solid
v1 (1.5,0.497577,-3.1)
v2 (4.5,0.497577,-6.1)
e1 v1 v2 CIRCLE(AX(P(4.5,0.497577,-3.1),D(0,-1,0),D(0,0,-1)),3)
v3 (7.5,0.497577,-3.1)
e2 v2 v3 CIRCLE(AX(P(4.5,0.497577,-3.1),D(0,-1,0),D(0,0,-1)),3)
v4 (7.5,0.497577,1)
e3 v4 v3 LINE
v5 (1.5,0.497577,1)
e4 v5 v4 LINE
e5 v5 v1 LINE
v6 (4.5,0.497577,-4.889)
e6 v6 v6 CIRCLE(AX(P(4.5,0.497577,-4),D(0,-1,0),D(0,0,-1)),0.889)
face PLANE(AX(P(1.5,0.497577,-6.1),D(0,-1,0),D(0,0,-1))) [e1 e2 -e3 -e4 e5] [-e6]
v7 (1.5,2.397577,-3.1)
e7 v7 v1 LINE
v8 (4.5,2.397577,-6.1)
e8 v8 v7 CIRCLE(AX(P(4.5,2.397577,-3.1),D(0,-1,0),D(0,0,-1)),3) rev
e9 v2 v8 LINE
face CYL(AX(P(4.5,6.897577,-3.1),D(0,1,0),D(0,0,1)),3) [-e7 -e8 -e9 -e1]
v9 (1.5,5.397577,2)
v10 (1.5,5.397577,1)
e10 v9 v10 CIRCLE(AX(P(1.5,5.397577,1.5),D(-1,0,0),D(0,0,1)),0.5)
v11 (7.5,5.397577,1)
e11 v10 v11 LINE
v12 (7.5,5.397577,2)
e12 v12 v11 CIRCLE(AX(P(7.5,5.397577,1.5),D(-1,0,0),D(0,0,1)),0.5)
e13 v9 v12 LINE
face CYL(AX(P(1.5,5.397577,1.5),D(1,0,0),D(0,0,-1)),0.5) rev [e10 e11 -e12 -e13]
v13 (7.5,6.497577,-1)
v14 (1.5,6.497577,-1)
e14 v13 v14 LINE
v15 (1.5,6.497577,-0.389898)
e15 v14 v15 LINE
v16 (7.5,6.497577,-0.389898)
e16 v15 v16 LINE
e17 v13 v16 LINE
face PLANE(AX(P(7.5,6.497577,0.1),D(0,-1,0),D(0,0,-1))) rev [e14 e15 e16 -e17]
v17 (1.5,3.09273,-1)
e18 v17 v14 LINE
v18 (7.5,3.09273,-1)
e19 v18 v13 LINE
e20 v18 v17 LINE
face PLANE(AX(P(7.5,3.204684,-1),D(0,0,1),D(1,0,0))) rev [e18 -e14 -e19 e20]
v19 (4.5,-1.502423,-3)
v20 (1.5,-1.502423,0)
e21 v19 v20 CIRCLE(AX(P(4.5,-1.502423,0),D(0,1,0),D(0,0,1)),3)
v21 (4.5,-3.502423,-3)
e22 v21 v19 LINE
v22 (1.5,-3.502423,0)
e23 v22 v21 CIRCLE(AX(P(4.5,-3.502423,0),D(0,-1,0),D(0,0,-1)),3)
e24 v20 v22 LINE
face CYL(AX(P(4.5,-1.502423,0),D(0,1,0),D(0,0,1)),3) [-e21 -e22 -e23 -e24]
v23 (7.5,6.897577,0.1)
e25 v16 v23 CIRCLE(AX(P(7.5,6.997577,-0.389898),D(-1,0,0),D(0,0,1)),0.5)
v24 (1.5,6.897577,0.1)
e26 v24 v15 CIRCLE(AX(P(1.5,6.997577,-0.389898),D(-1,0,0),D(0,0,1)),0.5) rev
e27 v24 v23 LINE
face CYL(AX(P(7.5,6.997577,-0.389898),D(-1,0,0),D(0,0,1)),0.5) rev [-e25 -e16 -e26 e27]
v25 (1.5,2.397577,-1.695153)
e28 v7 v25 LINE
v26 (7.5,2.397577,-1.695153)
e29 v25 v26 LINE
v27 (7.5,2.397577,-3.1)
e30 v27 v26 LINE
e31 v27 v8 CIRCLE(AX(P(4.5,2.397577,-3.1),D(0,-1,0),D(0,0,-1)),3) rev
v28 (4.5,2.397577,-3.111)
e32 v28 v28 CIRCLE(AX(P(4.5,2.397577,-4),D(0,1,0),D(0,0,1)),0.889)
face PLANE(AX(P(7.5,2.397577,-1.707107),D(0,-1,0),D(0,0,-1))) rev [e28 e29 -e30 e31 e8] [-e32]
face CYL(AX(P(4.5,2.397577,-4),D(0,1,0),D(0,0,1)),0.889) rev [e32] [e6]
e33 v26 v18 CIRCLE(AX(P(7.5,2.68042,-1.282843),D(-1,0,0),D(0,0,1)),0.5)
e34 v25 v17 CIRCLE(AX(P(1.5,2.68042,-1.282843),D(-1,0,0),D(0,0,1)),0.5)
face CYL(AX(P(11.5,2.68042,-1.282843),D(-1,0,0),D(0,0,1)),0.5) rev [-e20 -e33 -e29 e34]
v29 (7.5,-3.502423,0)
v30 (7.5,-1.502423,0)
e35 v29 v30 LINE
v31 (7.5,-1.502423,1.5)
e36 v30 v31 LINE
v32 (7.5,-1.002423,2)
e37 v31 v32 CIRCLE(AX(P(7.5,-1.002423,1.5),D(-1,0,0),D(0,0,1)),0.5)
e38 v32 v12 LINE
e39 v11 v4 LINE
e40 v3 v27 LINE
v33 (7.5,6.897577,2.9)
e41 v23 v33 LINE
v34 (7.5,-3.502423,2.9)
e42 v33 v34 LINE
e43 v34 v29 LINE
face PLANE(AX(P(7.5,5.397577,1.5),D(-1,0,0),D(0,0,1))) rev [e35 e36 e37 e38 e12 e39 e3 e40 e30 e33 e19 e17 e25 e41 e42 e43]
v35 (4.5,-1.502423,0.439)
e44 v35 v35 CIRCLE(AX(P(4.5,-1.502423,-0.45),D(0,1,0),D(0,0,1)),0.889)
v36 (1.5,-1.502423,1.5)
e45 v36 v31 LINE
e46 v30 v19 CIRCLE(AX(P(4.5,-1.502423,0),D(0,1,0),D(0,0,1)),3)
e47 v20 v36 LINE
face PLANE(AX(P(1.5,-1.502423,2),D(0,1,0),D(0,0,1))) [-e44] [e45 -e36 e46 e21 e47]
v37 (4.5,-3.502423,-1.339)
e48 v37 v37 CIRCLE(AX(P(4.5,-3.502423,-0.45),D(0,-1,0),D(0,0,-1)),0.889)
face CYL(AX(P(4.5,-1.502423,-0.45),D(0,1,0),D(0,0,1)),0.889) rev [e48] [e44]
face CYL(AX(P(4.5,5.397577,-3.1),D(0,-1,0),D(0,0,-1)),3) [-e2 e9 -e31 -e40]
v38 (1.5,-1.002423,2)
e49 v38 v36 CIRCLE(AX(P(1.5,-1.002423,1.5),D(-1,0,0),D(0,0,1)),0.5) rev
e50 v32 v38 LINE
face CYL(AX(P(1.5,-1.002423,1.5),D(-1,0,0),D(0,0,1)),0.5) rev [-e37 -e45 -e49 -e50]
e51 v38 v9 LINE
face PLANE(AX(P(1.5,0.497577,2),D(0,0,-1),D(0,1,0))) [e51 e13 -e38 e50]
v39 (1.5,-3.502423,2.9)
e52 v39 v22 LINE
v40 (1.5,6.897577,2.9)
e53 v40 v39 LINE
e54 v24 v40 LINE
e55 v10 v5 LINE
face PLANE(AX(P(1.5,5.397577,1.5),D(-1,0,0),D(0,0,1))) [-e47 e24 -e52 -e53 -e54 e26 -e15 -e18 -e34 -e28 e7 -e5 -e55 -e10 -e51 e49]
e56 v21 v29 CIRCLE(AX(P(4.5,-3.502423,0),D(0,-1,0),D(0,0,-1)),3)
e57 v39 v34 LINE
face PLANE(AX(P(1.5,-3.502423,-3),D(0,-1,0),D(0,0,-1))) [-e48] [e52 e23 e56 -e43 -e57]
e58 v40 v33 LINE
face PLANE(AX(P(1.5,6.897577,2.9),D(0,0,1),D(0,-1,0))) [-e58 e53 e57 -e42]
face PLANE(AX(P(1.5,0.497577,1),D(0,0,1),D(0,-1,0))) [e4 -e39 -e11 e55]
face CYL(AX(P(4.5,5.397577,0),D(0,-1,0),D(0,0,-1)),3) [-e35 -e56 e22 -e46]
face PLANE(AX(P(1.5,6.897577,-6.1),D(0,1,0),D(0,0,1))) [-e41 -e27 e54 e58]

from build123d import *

# Parameters (mm, degrees)
BOSS_EXTRUDE1_DEPTH       = 6
SKETCH3_W                 = 7.6
SKETCH3_H                 = 16
CUT_EXTRUDE2_DEPTH        = 11.990294347
CUT_EXTRUDE3_DEPTH        = 11.990294347
FILLET2_R                 = 3
FILLET3_R                 = 0.5
F_2_56_TAPPED_HOLE1_D     = 1.778
F_2_56_TAPPED_HOLE1_DEPTH = 3
F_2_56_TAPPED_HOLE1_TIP   = 0.53416509
SKETCH13_R                = 0.5
CUT_EXTRUDE10_DEPTH       = 10


# Some blends are built 0.0001 mm under size
with BuildPart() as part:
    # Sketch1 → Boss-Extrude1 (new body)
    with BuildSketch(Plane(origin=(7.5, 0, 0), x_dir=(0, 0, -1), z_dir=(1, 0, 0))):
        with BuildLine():
            Line((-2, 0.497577099), (-2, 5.397577099))
            ThreePointArc((-2, 5.397577099), (-1.5, 5.897577099), (-1, 5.397577099))
            Line((-1, 5.397577099), (-1, 0.497577099))
            Line((-1, 0.497577099), (6.1, 0.497577099))
            Line((6.1, 0.497577099), (6.1, 6.897577099))
            Line((6.1, 6.897577099), (-2.9, 6.897577099))
            Line((-2.9, 6.897577099), (-2.9, -3.502422901))
            Line((-2.9, -3.502422901), (3, -3.502422901))
            Line((3, -3.502422901), (3, -1.502422901))
            Line((3, -1.502422901), (-2, -1.502422901))
            Line((-2, -1.502422901), (-2, 0.497577099))
        make_face()
    extrude(amount=-BOSS_EXTRUDE1_DEPTH)

    # Sketch3 → Cut-Extrude2 (cut, through all)
    with BuildSketch(Plane.ZY.offset(-1.5)):
        with Locations((6.8, 14.497577099)):
            Rectangle(SKETCH3_W, SKETCH3_H)
        with Locations((-3.7, 14.497577099)):
            Rectangle(SKETCH3_W, SKETCH3_H)
    extrude(amount=-CUT_EXTRUDE2_DEPTH, mode=Mode.SUBTRACT)

    # Sketch4 → Cut-Extrude3 (cut, through all)
    with BuildSketch(Plane.ZY.offset(-1.5)):
        Polygon((-1.707106781, 2.397577099), (-1, 2.397577099), (-1, 3.20468388), (-1, 6.497577099), (-7.5, 6.497577099), (-7.5, 2.397577099), align=None)
    extrude(amount=-CUT_EXTRUDE3_DEPTH, mode=Mode.SUBTRACT)

    # Fillet2
    fillet2_edges = [part.edges().sort_by_distance(p)[0] for p in [
        (7.5, 1.447577099, -6.1),
        (1.5, 1.447577099, -6.1),
        (7.5, -2.502422901, -3),
        (1.5, -2.502422901, -3),
    ]]
    fillet(fillet2_edges, radius=FILLET2_R - 0.0001)  # a hair under: the kernel refuses the full size

    # Fillet3
    # the kernel refuses this fillet: 0.5 mm, written as the material it adds along each edge
    with BuildSketch(Plane(origin=(1.5, 6.497577099, 0.1), x_dir=(0, 1.0, -1.570583940679385e-12), z_dir=(1, 0, 0))) as fillet3_piece_1:
        with BuildLine():
            CenterArc((0.5, -0.489897949), FILLET3_R, 101.536959033, 78.463040967)
            Line((0, -0.489897949), (-0.01, -0.489897949))
            Line((-0.01, -0.489897949), (-0.01, 0))
            Line((-0.01, 0), (0, 0.01))
            ThreePointArc((0, 0.01), (0.2, 0.01), (0.398, 0.009797959))
            Line((0.398, 0.009797959), (0.4, 0))
        make_face()
    extrude(amount=6)
    with BuildSketch(Plane(origin=(7.5, -1.502422901, 2), x_dir=(0, 0, -1), z_dir=(-1, 0, 0))) as fillet3_piece_2:
        with BuildLine():
            CenterArc((FILLET3_R, -FILLET3_R), FILLET3_R, 90, 90)
            Line((0, -FILLET3_R), (-FILLET3_R * 0.02, -FILLET3_R))
            Line((-FILLET3_R * 0.02, -FILLET3_R), (-FILLET3_R * 0.02, FILLET3_R * 0.02))
            Line((-FILLET3_R * 0.02, FILLET3_R * 0.02), (FILLET3_R, FILLET3_R * 0.02))
            Line((FILLET3_R, FILLET3_R * 0.02), (FILLET3_R, 0))
        make_face()
    extrude(amount=6)

    # #2-56 Tapped Hole1
    with Locations(Plane(origin=(0, 2.397577099, 0), x_dir=(1, 0, 0), z_dir=(0, 1, 0))):
        with Locations((4.5, 4)):
            Hole(F_2_56_TAPPED_HOLE1_D / 2, depth=F_2_56_TAPPED_HOLE1_DEPTH)
            with Locations((0, 0, -(F_2_56_TAPPED_HOLE1_DEPTH + F_2_56_TAPPED_HOLE1_TIP / 2))):  # 118° drill point
                Cone(0, F_2_56_TAPPED_HOLE1_D / 2, F_2_56_TAPPED_HOLE1_TIP, mode=Mode.SUBTRACT)

    # Sketch12 → #2-56 Tapped Hole2 (revolve, cut)
    with BuildSketch(Plane(origin=(4.5, -1.502422901, -0.45), x_dir=(0, 0, 1), z_dir=(1, 0, 0))):
        Polygon((0, 0), (0, 5.87416509), (0.889, 5.34), (0.889, 0), align=None)
    revolve(axis=Axis((4.5, 4.847577099, -0.45), (0, -1, 0)), mode=Mode.SUBTRACT)

    # Sketch13 → Cut-Extrude10 (cut)
    with BuildSketch(Plane.ZY.offset(-1.5)):
        with Locations((-1.282842712, 2.680419811)):
            Circle(SKETCH13_R)
    extrude(amount=-CUT_EXTRUDE10_DEPTH, mode=Mode.SUBTRACT)


solid = part.part
